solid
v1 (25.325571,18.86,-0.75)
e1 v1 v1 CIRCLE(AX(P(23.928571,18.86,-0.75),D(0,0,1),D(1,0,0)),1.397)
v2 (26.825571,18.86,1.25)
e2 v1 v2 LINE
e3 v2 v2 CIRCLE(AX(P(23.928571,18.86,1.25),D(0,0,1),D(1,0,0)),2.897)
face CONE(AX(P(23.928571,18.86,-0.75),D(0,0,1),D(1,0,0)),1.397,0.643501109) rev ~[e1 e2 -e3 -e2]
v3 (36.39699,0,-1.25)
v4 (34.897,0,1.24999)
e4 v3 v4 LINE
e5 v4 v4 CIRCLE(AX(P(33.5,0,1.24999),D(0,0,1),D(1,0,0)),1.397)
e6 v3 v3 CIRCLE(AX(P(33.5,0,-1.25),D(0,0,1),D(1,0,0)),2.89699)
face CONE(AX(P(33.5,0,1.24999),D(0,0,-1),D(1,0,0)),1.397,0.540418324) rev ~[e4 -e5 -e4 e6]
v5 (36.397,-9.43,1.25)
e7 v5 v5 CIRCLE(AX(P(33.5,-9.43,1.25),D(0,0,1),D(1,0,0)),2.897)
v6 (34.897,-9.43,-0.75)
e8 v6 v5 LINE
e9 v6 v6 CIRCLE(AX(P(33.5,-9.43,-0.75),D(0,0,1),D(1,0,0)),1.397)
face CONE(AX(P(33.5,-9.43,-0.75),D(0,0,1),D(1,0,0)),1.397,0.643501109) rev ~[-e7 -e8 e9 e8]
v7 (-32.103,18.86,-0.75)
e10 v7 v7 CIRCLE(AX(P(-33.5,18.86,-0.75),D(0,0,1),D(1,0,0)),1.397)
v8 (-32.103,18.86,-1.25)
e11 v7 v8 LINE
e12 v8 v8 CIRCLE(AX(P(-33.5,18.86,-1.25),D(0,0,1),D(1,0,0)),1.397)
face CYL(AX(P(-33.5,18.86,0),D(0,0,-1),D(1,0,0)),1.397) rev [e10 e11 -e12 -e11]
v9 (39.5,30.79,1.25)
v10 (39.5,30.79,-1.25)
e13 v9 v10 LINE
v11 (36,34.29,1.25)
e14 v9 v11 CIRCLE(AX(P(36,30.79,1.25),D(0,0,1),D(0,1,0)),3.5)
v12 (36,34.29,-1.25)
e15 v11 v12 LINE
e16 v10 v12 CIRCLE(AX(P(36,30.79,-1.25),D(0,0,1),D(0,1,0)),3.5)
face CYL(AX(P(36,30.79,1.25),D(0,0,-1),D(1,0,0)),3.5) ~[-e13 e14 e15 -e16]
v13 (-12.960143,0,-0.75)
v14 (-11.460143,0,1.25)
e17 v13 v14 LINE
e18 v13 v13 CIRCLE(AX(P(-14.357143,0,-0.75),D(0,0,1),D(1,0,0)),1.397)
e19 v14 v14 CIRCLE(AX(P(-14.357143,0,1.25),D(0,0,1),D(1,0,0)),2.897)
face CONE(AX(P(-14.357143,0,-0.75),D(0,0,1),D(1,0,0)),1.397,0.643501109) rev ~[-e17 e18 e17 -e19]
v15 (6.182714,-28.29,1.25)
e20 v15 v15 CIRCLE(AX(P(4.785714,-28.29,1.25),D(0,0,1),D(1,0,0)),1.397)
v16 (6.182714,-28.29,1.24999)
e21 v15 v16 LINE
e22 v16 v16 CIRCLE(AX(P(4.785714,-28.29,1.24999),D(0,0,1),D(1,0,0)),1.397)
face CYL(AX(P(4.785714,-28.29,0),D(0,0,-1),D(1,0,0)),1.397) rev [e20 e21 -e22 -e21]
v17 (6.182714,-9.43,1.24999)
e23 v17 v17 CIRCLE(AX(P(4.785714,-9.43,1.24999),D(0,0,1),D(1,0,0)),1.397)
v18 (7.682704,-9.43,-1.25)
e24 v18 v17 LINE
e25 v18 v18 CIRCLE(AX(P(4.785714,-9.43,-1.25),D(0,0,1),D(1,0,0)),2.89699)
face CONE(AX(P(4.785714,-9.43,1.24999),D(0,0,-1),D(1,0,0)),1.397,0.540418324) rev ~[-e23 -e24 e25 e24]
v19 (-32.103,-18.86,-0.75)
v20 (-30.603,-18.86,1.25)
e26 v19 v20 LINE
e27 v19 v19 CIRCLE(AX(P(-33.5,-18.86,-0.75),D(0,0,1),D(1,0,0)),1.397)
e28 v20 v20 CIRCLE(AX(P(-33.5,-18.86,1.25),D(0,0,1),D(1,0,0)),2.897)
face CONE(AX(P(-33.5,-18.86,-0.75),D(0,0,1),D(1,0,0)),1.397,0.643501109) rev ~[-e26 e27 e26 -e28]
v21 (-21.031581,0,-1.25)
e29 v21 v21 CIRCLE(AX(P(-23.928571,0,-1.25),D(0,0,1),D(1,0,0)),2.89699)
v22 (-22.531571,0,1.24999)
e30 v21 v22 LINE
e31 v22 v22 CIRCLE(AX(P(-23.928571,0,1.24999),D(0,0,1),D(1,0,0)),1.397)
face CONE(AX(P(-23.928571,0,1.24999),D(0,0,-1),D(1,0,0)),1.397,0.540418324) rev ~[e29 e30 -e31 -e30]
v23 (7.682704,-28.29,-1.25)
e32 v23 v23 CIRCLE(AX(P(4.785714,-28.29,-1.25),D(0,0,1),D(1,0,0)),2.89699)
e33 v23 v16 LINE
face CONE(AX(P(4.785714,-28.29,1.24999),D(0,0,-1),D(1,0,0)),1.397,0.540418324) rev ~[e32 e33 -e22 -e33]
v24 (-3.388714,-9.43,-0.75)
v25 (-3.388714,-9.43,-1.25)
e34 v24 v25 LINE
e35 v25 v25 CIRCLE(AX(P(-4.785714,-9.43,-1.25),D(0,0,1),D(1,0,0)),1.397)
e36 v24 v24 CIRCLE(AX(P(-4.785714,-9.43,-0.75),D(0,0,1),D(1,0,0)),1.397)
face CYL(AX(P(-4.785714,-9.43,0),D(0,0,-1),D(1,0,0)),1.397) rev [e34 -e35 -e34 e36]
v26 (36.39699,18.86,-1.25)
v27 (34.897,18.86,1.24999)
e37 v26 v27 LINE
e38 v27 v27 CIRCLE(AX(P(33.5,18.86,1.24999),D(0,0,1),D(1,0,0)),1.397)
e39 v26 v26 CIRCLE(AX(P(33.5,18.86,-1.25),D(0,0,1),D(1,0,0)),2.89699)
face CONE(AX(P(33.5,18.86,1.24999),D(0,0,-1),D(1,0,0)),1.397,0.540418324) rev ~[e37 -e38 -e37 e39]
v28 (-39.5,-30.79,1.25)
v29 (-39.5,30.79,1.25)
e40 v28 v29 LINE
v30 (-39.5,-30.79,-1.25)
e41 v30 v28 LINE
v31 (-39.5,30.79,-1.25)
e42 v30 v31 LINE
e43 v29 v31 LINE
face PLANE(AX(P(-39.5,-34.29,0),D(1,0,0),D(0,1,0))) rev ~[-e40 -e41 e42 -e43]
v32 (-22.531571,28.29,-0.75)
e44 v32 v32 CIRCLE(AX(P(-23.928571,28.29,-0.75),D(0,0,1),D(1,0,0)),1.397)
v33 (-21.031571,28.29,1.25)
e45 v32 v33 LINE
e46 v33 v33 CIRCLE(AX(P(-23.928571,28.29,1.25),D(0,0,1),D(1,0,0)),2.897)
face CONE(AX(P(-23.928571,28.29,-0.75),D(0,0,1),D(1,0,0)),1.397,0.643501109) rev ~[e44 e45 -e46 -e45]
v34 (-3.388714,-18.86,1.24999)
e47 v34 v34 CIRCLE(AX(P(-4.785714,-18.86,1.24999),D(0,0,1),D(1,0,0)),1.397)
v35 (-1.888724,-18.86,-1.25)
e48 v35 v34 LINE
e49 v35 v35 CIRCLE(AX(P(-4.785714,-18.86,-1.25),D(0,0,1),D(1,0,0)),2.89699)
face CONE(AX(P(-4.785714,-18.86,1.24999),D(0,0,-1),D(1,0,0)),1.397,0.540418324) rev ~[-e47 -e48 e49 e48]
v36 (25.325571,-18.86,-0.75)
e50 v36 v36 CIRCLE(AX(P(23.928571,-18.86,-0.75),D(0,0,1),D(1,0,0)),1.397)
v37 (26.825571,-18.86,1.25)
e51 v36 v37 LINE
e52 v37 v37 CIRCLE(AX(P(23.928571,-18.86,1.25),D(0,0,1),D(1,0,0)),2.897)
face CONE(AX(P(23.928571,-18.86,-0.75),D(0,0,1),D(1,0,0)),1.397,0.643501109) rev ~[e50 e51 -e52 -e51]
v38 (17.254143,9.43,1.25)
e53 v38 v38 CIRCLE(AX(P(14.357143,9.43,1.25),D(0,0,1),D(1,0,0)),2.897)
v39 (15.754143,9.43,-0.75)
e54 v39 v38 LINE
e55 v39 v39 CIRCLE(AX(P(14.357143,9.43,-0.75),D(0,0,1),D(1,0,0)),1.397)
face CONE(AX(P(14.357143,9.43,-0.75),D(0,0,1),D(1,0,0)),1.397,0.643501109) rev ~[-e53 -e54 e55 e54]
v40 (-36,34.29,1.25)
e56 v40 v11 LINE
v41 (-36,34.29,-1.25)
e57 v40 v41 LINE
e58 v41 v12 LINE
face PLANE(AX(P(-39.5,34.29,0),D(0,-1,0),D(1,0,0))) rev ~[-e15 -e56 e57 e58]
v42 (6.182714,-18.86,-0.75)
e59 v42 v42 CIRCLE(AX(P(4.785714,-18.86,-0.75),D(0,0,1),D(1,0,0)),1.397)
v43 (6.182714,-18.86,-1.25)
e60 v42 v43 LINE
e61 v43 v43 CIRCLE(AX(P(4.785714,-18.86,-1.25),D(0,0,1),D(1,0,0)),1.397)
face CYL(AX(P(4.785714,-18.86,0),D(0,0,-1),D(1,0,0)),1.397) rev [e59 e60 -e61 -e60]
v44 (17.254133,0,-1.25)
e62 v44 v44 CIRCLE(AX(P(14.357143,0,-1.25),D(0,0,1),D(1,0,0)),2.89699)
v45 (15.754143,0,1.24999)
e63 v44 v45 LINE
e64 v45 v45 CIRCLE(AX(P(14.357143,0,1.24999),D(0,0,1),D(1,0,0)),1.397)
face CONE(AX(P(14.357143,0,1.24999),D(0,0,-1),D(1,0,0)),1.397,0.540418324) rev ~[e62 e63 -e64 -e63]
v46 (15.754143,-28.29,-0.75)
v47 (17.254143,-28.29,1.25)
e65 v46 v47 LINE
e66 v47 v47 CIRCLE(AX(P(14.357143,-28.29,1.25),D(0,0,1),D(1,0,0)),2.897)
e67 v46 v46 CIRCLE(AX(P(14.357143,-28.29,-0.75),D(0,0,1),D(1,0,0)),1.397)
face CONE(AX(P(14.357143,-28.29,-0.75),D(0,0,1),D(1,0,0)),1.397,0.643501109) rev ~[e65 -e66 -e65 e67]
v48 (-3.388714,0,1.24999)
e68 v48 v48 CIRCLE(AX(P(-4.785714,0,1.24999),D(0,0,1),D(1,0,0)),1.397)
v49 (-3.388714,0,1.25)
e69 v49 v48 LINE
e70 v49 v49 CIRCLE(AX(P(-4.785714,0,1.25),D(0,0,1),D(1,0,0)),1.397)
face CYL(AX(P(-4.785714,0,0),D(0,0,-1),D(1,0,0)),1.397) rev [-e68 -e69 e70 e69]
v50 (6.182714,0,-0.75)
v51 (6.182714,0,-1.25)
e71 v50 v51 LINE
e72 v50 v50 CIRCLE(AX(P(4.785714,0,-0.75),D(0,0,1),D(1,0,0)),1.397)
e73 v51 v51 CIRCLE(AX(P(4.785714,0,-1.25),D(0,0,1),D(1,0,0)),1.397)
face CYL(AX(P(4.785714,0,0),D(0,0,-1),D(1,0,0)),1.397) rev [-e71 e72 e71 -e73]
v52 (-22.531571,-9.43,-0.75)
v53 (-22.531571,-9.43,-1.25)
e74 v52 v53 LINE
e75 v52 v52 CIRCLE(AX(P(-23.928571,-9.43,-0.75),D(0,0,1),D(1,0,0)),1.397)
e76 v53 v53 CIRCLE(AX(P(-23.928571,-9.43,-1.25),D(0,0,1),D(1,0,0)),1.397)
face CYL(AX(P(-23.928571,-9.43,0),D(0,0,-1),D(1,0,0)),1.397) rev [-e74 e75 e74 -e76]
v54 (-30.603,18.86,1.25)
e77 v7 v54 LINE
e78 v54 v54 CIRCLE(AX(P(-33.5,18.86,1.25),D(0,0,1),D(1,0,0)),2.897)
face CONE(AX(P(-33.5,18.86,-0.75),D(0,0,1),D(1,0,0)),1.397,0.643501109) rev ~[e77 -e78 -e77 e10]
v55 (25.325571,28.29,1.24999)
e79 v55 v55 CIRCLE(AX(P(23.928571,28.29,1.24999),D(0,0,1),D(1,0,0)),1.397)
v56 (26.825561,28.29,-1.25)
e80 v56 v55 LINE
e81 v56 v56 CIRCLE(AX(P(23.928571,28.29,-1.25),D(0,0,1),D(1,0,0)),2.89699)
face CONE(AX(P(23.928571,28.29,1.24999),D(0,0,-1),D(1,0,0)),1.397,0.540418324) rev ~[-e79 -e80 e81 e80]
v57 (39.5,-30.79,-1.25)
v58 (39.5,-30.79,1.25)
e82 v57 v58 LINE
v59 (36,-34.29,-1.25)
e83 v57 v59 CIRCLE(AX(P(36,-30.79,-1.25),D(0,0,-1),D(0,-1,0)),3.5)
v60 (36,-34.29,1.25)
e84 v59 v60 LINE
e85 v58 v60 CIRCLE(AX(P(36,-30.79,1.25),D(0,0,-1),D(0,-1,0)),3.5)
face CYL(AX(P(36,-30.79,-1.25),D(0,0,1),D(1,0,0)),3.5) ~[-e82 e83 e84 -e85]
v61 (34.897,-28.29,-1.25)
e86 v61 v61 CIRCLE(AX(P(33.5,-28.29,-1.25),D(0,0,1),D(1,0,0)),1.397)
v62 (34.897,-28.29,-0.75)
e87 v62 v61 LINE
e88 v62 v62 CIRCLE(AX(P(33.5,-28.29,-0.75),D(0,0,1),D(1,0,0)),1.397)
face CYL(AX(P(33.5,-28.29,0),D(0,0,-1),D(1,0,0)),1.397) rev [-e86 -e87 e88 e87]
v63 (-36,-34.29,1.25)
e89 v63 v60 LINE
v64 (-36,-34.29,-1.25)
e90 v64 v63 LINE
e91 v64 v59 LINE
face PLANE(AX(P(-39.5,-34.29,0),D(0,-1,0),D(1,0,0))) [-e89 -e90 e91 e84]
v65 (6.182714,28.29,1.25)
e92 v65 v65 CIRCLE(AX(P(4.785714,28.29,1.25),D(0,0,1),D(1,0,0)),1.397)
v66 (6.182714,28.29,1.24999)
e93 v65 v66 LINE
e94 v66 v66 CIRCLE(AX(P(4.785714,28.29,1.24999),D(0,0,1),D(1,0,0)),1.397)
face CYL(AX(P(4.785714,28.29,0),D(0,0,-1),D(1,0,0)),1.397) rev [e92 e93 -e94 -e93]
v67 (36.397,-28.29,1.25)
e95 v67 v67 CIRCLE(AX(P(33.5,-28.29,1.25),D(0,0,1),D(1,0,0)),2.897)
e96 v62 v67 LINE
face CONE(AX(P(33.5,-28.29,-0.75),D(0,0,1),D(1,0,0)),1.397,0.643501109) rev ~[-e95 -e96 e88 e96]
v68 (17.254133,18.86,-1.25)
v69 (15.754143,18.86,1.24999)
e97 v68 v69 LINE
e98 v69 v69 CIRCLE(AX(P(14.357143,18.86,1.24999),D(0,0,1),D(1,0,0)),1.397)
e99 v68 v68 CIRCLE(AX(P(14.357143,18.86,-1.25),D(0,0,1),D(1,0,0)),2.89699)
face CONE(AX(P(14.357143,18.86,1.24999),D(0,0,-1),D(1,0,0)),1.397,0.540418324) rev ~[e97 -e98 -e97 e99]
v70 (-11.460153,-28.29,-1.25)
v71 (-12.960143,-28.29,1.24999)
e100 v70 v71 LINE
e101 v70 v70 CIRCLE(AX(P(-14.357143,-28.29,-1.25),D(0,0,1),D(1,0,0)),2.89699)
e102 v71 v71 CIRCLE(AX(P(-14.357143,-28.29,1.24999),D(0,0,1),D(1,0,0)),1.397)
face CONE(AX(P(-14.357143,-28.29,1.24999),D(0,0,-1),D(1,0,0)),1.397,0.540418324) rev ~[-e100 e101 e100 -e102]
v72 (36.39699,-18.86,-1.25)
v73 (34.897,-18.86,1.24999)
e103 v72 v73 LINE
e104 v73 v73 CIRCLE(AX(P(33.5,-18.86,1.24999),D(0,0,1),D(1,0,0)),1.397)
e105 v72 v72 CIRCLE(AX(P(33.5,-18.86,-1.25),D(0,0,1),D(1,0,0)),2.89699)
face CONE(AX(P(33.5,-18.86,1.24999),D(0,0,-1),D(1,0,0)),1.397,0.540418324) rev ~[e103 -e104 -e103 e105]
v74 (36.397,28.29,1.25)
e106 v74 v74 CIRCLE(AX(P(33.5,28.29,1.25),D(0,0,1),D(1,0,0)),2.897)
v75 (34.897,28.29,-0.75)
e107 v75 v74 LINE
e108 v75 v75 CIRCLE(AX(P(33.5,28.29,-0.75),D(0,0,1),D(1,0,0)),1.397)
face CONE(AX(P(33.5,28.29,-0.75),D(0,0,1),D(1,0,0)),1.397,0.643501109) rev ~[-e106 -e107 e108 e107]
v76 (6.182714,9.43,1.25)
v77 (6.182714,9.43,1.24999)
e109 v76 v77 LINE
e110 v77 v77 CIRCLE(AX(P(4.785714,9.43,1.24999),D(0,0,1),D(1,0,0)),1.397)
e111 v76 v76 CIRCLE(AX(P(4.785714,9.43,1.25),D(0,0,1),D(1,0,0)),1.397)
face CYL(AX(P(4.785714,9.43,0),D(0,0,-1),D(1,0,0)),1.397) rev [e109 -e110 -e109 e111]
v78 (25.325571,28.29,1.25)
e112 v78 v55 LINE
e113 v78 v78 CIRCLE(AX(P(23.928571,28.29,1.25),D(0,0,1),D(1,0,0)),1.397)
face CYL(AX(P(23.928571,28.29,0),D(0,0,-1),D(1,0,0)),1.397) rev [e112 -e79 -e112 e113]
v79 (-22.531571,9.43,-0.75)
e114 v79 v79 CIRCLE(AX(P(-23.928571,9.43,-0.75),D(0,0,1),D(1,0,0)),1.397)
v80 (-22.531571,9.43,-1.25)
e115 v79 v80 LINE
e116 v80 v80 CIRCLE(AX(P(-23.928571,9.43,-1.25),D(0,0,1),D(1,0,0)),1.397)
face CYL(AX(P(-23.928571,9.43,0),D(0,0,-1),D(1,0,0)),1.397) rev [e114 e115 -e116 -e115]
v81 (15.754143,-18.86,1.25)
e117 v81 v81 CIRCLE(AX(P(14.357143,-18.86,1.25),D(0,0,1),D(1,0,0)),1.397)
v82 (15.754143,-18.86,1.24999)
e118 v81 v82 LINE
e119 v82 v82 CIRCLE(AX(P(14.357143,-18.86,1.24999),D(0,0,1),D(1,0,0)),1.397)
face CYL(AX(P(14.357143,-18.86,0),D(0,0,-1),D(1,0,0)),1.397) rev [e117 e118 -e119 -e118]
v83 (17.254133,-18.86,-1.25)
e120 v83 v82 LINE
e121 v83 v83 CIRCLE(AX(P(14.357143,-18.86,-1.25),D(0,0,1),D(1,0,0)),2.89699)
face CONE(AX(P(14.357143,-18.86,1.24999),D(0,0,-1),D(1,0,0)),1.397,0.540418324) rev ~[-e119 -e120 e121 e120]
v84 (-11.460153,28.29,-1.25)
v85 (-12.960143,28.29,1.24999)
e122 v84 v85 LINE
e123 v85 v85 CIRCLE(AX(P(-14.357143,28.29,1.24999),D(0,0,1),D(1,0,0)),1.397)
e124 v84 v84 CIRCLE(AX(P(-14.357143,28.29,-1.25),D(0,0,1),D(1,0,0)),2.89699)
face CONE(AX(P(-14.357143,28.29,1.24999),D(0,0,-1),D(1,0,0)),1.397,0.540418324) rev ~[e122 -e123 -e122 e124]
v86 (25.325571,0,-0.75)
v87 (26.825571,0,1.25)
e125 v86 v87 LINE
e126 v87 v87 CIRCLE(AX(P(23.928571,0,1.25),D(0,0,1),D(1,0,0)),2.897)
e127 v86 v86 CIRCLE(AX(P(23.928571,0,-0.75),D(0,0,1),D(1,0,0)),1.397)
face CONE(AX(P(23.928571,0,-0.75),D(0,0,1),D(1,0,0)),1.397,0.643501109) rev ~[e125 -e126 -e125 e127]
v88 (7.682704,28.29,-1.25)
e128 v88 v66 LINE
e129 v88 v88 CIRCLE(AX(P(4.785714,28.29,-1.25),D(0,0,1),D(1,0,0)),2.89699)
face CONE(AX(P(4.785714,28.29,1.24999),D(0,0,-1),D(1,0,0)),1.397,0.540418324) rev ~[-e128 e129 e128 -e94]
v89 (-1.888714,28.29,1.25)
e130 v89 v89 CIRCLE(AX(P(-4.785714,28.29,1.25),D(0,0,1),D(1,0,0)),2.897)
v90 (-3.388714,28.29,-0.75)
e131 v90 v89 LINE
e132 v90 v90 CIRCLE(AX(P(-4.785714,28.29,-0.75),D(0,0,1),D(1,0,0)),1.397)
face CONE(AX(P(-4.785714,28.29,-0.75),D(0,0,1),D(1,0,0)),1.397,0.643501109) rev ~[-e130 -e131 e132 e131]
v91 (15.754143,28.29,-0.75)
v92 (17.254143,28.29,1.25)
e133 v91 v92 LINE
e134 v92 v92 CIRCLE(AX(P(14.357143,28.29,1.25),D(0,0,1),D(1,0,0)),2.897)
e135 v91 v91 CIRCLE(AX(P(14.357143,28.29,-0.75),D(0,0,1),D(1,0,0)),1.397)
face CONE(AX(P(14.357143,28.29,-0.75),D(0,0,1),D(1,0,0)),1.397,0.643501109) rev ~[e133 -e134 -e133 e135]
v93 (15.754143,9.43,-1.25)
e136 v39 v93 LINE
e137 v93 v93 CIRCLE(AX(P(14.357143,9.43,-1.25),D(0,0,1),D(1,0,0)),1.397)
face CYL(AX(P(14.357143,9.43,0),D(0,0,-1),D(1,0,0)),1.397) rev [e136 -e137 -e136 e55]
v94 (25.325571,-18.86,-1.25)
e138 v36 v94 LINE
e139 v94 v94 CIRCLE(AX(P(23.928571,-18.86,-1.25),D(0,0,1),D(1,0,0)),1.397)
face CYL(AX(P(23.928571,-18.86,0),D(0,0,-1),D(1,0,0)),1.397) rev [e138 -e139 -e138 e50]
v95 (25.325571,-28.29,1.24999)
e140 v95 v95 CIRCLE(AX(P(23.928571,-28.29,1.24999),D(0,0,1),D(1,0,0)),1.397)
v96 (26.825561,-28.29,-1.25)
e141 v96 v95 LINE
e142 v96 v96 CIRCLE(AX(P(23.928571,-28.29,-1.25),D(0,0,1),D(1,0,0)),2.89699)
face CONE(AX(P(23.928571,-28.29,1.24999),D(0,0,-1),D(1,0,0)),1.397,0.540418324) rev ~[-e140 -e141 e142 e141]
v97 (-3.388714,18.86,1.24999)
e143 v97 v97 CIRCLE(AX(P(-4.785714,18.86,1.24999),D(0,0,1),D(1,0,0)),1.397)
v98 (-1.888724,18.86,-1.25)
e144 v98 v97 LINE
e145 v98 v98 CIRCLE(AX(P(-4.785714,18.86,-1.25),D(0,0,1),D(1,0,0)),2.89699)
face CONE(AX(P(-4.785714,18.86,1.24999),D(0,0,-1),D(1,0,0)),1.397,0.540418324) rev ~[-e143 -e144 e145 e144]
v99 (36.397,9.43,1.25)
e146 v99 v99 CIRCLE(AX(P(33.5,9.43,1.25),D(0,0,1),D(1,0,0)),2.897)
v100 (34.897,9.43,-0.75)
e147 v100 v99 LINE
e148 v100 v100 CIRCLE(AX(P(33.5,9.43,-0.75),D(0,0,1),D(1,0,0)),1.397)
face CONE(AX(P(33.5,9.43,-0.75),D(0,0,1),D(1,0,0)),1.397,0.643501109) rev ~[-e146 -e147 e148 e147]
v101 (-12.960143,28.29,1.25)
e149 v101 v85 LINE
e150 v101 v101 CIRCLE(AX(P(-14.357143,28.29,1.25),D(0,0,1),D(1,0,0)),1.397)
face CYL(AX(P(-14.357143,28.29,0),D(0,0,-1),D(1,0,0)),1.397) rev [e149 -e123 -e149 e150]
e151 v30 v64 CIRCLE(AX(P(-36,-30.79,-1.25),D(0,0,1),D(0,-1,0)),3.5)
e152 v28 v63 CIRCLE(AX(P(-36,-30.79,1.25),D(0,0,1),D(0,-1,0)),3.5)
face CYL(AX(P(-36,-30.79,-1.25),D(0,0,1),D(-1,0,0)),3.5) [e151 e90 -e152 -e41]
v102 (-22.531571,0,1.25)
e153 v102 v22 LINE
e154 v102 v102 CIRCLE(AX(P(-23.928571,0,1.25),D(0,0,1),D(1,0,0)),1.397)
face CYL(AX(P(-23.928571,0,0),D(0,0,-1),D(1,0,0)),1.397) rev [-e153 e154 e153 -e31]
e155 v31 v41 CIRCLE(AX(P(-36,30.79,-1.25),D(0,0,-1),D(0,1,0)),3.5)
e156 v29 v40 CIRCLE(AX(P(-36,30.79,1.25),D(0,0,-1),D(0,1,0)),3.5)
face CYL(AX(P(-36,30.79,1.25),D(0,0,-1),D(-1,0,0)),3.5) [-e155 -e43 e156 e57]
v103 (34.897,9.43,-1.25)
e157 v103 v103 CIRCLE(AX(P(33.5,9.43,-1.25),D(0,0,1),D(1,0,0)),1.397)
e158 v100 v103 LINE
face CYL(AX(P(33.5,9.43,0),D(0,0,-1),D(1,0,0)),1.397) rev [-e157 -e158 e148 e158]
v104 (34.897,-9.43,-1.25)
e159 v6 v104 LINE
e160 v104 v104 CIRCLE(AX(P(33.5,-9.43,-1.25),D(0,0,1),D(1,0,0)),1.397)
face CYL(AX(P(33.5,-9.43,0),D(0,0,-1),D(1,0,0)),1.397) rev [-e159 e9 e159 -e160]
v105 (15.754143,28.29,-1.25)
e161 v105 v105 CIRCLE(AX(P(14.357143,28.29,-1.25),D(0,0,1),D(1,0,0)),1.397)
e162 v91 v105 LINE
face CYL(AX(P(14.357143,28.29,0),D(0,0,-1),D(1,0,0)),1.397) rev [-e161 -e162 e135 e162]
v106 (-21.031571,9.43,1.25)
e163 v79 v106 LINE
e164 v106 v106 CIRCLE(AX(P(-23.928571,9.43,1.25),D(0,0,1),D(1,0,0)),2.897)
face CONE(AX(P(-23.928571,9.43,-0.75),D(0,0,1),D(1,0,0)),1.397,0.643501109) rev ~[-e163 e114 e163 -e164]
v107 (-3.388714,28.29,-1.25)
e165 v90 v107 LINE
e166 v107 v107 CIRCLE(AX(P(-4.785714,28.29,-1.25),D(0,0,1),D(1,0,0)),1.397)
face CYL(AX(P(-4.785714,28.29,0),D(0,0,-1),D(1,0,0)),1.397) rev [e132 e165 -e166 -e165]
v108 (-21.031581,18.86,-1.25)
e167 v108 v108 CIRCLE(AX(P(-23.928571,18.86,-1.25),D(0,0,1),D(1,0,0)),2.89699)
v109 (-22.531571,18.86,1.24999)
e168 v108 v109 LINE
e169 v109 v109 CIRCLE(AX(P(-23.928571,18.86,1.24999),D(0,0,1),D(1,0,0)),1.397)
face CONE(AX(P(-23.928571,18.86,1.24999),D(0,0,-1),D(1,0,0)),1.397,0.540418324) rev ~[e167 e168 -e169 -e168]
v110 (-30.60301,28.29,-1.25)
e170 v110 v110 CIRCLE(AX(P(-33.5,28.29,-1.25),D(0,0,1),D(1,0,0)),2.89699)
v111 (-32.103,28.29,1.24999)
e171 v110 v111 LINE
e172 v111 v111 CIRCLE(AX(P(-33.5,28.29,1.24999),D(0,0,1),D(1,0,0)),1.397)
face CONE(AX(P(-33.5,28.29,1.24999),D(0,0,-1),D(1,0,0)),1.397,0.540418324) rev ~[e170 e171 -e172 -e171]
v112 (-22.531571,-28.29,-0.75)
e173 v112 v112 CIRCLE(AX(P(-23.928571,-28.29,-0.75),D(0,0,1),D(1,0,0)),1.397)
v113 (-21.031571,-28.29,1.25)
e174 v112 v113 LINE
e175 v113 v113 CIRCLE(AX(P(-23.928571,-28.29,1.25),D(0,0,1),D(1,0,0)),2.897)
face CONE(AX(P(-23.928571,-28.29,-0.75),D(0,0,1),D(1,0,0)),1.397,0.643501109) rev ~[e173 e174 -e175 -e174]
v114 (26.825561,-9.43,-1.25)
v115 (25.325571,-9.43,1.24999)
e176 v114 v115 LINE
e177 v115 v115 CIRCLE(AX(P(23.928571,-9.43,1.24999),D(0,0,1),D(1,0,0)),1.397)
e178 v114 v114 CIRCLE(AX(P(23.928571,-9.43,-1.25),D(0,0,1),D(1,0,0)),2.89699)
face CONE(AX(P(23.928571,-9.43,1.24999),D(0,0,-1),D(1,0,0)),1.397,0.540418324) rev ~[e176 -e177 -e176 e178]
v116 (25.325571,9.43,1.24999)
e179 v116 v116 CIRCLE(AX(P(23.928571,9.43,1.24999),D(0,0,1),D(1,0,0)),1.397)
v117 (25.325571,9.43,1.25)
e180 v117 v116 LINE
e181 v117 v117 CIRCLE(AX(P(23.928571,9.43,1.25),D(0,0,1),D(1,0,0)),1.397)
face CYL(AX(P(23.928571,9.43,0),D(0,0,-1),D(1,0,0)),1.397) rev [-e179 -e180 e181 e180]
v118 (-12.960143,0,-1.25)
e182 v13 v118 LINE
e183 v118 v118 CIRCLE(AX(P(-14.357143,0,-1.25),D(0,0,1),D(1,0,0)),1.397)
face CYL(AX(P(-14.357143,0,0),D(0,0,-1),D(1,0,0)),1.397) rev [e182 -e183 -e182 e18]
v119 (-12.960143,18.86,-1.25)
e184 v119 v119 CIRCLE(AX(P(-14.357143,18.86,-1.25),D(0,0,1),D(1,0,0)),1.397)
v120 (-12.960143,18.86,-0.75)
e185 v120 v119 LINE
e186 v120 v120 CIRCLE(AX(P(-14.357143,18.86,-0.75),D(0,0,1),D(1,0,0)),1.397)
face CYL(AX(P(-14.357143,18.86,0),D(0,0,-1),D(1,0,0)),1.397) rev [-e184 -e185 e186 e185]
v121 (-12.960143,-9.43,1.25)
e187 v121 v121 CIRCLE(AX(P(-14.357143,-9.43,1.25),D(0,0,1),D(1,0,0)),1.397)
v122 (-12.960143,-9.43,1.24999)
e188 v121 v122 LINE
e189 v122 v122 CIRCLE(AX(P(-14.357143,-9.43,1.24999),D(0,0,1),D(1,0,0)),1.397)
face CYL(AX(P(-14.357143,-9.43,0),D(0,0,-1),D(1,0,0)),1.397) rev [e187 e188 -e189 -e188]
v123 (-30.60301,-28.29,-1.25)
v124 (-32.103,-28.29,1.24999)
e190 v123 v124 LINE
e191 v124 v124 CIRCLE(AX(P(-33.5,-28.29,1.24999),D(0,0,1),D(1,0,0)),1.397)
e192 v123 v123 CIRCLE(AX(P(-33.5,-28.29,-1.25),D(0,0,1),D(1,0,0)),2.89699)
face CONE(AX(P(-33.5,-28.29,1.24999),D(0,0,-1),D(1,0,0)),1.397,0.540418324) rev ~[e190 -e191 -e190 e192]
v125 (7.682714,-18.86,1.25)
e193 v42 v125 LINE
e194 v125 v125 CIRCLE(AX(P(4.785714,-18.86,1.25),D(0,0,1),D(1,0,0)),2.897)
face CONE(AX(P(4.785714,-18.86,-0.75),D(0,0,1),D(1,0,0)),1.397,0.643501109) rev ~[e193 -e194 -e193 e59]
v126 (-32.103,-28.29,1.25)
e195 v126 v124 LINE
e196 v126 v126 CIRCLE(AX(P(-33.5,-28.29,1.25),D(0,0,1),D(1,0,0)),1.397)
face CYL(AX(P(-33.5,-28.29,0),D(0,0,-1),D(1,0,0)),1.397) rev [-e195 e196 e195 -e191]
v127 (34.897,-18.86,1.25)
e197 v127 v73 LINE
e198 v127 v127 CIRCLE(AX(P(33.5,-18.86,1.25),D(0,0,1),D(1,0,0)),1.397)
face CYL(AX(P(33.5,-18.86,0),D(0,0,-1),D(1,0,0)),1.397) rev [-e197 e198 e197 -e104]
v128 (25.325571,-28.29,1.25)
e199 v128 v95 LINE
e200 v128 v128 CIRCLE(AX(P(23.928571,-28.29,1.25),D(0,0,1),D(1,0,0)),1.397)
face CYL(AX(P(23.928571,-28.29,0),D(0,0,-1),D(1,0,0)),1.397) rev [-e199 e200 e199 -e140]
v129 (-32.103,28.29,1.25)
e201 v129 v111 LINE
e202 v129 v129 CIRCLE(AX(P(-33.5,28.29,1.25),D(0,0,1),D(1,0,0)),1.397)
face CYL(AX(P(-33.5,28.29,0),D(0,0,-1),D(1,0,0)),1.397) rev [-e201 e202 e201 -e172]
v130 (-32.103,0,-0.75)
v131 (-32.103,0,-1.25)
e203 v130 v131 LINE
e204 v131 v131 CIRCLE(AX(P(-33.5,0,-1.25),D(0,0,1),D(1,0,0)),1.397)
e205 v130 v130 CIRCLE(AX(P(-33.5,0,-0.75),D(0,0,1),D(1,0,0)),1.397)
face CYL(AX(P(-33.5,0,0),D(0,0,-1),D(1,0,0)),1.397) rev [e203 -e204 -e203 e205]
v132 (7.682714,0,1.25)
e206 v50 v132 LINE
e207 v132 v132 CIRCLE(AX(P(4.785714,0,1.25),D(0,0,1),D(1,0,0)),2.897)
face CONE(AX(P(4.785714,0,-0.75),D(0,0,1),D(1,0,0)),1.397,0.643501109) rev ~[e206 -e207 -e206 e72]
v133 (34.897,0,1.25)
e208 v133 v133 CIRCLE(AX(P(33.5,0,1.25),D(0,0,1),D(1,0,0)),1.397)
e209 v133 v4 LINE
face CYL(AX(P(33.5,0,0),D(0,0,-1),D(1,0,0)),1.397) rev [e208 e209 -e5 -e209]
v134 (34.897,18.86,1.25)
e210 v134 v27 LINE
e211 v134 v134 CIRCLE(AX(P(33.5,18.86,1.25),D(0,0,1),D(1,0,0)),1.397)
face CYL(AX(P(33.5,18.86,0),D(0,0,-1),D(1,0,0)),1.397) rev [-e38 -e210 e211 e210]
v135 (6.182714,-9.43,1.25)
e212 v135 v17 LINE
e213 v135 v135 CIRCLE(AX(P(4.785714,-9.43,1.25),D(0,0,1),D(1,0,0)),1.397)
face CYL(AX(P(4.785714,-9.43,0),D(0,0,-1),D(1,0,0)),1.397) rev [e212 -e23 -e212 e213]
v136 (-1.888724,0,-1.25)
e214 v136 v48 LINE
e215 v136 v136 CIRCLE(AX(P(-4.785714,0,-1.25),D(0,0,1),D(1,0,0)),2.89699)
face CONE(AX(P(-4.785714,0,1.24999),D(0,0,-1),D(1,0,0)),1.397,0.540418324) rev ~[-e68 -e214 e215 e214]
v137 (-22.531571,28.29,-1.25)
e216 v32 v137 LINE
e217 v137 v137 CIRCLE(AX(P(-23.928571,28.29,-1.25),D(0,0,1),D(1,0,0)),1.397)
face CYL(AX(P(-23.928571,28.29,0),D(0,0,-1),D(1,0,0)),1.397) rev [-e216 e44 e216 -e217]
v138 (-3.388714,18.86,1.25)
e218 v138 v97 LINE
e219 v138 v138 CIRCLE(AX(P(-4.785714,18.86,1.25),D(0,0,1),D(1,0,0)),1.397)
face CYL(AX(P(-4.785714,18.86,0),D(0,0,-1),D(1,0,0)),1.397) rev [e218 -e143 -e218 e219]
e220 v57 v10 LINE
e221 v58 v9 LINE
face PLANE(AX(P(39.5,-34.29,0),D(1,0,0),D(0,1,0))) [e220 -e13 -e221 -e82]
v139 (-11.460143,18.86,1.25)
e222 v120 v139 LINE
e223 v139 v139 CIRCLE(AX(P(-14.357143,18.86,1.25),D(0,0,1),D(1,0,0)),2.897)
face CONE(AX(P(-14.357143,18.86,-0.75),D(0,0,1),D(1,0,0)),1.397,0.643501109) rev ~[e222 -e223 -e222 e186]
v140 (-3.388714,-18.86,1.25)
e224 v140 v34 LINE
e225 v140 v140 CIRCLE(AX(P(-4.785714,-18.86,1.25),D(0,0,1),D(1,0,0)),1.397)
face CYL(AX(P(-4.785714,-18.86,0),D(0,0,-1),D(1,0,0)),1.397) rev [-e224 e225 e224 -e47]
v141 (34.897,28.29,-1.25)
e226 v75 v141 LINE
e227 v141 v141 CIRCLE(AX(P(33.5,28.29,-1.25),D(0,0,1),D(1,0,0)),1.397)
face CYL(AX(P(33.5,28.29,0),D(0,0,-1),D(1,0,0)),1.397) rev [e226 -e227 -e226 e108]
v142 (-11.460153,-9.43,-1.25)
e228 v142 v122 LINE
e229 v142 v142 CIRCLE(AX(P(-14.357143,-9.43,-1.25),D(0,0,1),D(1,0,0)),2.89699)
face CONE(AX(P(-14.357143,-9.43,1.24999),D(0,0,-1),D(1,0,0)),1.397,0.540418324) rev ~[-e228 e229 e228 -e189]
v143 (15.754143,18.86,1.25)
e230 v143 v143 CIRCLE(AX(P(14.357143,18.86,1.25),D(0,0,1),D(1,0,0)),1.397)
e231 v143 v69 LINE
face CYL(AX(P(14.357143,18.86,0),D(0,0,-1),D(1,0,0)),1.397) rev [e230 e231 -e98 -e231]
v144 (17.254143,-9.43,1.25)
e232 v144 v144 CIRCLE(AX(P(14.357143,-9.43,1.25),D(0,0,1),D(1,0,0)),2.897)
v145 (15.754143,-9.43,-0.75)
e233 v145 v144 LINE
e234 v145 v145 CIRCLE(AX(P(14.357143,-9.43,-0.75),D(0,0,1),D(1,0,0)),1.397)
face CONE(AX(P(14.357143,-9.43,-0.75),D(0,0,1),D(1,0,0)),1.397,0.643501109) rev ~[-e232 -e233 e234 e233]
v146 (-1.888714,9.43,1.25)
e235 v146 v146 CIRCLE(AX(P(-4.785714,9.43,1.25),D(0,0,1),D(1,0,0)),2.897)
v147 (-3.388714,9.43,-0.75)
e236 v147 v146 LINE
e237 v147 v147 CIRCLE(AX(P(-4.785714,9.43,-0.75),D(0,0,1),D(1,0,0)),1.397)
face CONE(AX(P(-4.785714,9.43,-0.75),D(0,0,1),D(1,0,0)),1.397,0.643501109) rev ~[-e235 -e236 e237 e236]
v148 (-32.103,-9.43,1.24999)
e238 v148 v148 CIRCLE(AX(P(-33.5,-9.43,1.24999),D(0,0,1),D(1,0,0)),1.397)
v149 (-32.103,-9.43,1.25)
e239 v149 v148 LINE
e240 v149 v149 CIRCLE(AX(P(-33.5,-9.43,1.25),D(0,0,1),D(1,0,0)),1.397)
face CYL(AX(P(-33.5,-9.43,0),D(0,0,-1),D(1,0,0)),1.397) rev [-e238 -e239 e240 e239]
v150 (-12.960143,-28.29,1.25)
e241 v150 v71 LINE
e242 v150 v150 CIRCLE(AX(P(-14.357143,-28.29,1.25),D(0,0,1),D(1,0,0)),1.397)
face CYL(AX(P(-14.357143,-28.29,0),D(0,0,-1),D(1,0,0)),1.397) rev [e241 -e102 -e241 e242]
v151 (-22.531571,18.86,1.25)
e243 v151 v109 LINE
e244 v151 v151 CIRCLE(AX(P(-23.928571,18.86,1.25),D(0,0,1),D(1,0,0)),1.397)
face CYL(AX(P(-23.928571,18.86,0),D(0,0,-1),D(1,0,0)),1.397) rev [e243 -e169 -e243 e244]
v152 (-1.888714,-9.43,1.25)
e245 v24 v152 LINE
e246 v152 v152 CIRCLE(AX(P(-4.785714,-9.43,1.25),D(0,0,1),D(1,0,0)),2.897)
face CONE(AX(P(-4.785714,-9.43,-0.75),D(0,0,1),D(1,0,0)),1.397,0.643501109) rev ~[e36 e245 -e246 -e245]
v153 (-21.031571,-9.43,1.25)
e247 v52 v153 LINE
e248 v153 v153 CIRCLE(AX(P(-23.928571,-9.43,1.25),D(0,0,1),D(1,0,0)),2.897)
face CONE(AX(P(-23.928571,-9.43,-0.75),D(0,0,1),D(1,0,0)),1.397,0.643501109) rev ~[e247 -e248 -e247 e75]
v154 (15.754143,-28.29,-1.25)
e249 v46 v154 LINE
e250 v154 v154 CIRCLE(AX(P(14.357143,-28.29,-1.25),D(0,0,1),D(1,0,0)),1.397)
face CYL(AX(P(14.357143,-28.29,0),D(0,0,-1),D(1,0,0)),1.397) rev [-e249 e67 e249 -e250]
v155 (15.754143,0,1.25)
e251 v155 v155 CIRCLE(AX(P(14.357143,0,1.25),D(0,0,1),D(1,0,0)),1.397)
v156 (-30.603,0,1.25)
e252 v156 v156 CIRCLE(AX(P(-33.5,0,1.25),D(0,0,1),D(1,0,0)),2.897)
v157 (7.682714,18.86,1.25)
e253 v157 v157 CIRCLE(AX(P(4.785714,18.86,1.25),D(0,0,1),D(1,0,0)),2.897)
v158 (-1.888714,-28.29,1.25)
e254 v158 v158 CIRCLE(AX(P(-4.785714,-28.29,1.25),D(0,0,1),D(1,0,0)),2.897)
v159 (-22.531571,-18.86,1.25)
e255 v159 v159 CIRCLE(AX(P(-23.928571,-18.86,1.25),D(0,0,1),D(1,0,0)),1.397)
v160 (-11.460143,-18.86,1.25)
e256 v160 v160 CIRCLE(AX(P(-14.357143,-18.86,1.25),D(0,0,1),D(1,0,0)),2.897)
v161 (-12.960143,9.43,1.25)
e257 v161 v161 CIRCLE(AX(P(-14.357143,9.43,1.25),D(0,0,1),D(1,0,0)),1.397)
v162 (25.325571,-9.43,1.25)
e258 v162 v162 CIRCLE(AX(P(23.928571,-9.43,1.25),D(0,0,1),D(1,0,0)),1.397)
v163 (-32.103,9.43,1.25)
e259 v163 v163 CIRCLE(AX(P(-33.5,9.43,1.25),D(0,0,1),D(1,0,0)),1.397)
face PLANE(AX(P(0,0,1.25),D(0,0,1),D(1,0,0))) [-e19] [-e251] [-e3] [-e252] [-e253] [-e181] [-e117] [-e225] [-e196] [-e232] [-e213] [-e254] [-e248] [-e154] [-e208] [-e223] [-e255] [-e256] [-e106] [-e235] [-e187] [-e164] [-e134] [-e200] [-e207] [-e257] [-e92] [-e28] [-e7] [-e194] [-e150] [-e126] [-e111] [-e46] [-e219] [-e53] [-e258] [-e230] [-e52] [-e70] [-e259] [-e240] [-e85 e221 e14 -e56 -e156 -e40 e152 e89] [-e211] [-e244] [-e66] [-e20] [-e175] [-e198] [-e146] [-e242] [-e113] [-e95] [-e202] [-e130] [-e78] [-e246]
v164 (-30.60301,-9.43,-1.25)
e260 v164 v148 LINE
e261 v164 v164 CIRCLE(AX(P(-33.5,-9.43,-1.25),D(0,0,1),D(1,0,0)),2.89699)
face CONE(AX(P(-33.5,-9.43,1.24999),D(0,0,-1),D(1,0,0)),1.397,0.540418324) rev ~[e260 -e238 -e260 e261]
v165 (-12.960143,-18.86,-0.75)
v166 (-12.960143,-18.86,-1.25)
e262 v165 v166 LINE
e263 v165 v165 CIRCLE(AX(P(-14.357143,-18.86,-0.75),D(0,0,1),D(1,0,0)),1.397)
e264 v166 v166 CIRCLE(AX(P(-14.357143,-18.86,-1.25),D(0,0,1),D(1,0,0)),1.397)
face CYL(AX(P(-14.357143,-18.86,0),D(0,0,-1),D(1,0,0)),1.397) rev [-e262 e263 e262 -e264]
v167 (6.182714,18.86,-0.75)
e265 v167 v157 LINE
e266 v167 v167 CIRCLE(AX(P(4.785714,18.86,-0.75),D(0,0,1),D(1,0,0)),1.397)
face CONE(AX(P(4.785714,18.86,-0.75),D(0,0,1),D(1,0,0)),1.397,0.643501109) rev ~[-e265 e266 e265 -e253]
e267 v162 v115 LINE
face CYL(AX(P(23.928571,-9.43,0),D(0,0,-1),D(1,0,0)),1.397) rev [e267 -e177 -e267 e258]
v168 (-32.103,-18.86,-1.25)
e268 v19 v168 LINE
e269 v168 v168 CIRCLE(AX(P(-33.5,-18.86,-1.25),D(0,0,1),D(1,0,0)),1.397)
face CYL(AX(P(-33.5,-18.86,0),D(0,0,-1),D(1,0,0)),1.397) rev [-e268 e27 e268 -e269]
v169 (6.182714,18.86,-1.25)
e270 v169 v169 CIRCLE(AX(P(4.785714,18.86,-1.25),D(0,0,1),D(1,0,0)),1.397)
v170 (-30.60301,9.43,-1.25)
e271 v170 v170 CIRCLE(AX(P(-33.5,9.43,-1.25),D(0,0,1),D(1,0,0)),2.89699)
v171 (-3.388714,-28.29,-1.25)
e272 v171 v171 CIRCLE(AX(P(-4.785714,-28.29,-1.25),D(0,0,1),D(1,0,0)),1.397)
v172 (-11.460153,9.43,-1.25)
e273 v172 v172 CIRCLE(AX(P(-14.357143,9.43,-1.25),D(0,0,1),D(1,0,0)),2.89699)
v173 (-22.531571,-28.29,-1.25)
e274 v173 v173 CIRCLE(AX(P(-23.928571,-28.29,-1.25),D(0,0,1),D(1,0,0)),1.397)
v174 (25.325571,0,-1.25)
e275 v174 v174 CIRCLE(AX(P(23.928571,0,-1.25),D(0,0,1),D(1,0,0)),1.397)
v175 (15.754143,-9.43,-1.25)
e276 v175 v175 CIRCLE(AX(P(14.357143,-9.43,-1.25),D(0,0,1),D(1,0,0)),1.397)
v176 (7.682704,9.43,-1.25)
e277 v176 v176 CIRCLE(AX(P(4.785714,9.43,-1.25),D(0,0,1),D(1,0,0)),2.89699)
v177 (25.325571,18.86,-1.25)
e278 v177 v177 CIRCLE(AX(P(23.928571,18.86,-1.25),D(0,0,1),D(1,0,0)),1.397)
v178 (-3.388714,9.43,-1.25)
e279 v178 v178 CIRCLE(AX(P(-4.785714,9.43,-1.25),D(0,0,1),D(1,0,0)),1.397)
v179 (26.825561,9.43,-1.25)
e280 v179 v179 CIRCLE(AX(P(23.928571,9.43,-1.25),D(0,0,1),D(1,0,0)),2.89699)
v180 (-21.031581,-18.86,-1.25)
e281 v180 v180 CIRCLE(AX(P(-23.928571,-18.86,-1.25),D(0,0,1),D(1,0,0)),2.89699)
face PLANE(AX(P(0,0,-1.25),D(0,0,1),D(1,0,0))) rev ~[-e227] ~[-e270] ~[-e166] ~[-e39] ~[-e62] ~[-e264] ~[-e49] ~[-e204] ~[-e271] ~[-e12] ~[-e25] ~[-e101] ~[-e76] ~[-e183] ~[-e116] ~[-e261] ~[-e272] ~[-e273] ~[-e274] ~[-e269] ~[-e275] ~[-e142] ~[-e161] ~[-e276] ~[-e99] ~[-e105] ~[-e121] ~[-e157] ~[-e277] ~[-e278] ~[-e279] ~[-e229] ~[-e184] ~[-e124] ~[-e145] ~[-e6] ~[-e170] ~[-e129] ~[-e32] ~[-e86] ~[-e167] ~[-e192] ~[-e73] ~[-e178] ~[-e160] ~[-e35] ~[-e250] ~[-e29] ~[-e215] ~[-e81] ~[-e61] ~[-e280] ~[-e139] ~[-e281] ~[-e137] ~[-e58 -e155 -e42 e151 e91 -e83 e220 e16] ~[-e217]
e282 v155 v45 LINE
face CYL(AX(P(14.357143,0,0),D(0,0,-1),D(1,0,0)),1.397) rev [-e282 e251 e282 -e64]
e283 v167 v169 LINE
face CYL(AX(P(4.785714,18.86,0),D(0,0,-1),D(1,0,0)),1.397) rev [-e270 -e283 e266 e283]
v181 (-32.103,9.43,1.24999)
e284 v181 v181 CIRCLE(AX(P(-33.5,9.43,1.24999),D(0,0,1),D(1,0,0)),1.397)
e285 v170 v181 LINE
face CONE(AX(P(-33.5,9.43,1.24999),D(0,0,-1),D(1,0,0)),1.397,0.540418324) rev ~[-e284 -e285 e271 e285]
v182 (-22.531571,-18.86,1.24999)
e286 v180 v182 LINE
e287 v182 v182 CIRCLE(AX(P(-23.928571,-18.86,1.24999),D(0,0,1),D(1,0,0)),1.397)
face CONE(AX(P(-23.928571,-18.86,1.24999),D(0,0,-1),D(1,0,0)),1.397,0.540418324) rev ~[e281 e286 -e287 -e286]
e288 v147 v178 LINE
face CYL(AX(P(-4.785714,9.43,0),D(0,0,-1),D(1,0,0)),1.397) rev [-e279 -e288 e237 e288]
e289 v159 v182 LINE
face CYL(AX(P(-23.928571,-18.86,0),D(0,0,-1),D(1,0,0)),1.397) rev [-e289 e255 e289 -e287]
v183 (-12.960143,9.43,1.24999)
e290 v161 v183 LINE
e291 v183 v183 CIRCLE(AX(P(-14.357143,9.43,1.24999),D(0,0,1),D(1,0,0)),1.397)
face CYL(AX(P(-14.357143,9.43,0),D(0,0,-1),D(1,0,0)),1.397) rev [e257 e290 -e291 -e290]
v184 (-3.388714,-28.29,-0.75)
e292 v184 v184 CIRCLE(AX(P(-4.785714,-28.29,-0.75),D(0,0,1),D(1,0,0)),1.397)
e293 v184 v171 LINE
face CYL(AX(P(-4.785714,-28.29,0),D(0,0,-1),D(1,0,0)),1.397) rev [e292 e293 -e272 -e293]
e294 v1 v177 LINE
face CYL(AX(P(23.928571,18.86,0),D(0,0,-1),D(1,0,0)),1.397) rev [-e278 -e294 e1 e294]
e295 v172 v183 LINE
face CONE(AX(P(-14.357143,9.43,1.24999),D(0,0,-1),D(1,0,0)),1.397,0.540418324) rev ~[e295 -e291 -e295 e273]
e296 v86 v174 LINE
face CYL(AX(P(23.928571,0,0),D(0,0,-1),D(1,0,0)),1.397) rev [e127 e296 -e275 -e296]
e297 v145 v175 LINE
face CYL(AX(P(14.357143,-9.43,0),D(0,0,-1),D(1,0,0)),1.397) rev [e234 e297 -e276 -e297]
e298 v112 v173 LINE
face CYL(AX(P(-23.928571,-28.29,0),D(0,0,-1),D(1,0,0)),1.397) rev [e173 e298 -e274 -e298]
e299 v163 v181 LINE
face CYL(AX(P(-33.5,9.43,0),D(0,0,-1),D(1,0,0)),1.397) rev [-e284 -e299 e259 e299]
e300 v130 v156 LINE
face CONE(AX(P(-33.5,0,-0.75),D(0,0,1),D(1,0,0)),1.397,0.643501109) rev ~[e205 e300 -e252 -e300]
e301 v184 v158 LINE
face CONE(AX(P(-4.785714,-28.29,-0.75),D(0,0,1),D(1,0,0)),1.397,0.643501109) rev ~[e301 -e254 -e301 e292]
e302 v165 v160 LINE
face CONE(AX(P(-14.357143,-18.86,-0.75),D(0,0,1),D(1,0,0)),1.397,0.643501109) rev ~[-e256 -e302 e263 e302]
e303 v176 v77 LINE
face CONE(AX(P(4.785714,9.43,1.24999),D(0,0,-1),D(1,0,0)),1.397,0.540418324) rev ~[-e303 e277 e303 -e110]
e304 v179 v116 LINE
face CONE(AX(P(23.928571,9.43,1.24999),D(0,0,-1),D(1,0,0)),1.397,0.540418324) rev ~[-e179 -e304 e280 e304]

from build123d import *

# Parameters (mm, degrees)
F0_W        = 79
F0_H        = 68.58
F0_R        = 1.397
F1_DEPTH    = 1.25
F2_R        = 3.5
F3_SIZE2    = 2.49999
F3_SIZE     = 1.49999
F4_SIZE2    = 1.5
F4_SIZE     = 2
F4_2_SIZE2  = 1.5
F4_2_SIZE   = 2
F4_3_SIZE2  = 1.5
F4_3_SIZE   = 2
F4_4_SIZE2  = 1.5
F4_4_SIZE   = 2
F4_5_SIZE2  = 1.5
F4_5_SIZE   = 2
F4_6_SIZE2  = 1.5
F4_6_SIZE   = 2
F4_7_SIZE2  = 1.5
F4_7_SIZE   = 2
F4_8_SIZE2  = 1.5
F4_8_SIZE   = 2
F4_9_SIZE2  = 1.5
F4_9_SIZE   = 2
F4_10_SIZE2 = 1.5
F4_10_SIZE  = 2
F4_11_SIZE2 = 1.5
F4_11_SIZE  = 2
F4_12_SIZE2 = 1.5
F4_12_SIZE  = 2
F4_13_SIZE2 = 1.5
F4_13_SIZE  = 2
F4_14_SIZE2 = 1.5
F4_14_SIZE  = 2
F4_15_SIZE2 = 1.5
F4_15_SIZE  = 2
F4_16_SIZE2 = 1.5
F4_16_SIZE  = 2
F4_17_SIZE2 = 1.5
F4_17_SIZE  = 2
F4_18_SIZE2 = 1.5
F4_18_SIZE  = 2
F4_19_SIZE2 = 1.5
F4_19_SIZE  = 2
F4_20_SIZE2 = 1.5
F4_20_SIZE  = 2
F4_21_SIZE2 = 1.5
F4_21_SIZE  = 2
F4_22_SIZE2 = 1.5
F4_22_SIZE  = 2
F4_23_SIZE2 = 1.5
F4_23_SIZE  = 2
F4_24_SIZE2 = 1.5
F4_24_SIZE  = 2
F4_25_SIZE2 = 1.5
F4_25_SIZE  = 2
F4_26_SIZE2 = 1.5
F4_26_SIZE  = 2
F4_27_SIZE2 = 1.5
F4_27_SIZE  = 2
F4_28_SIZE2 = 1.5
F4_28_SIZE  = 2


# Not quite as in the source:
# - a fillet or chamfer is up to 0.001 mm smaller than in the source, because OpenCascade refuses the exact size


with BuildPart() as f1:
    # F0 (on Top) → F1 (new body, symmetric)
    with BuildSketch(Plane.XY):
        Rectangle(F0_W, F0_H)
        with Locations((-33.5, -28.29)):
            Circle(F0_R, mode=Mode.SUBTRACT)
        with Locations((-23.9285714286, -28.29)):
            Circle(F0_R, mode=Mode.SUBTRACT)
        with Locations((-33.5, -18.86)):
            Circle(F0_R, mode=Mode.SUBTRACT)
        with Locations((-23.9285714286, -18.86)):
            Circle(F0_R, mode=Mode.SUBTRACT)
        with Locations((-14.3571428571, -28.29)):
            Circle(F0_R, mode=Mode.SUBTRACT)
        with Locations((-4.7857142857, -28.29)):
            Circle(F0_R, mode=Mode.SUBTRACT)
        with Locations((-14.3571428571, -18.86)):
            Circle(F0_R, mode=Mode.SUBTRACT)
        with Locations((-4.7857142857, -18.86)):
            Circle(F0_R, mode=Mode.SUBTRACT)
        with Locations((-33.5, -9.43)):
            Circle(F0_R, mode=Mode.SUBTRACT)
        with Locations((-23.9285714286, -9.43)):
            Circle(F0_R, mode=Mode.SUBTRACT)
        with Locations((-14.3571428571, -9.43)):
            Circle(F0_R, mode=Mode.SUBTRACT)
        with Locations((-4.7857142857, -9.43)):
            Circle(F0_R, mode=Mode.SUBTRACT)
        with Locations((4.7857142857, -28.29)):
            Circle(F0_R, mode=Mode.SUBTRACT)
        with Locations((14.3571428571, -28.29)):
            Circle(F0_R, mode=Mode.SUBTRACT)
        with Locations((4.7857142857, -18.86)):
            Circle(F0_R, mode=Mode.SUBTRACT)
        with Locations((14.3571428571, -18.86)):
            Circle(F0_R, mode=Mode.SUBTRACT)
        with Locations((23.9285714286, -28.29)):
            Circle(F0_R, mode=Mode.SUBTRACT)
        with Locations((33.5, -28.29)):
            Circle(F0_R, mode=Mode.SUBTRACT)
        with Locations((23.9285714286, -18.86)):
            Circle(F0_R, mode=Mode.SUBTRACT)
        with Locations((33.5, -18.86)):
            Circle(F0_R, mode=Mode.SUBTRACT)
        with Locations((4.7857142857, -9.43)):
            Circle(F0_R, mode=Mode.SUBTRACT)
        with Locations((14.3571428571, -9.43)):
            Circle(F0_R, mode=Mode.SUBTRACT)
        with Locations((23.9285714286, -9.43)):
            Circle(F0_R, mode=Mode.SUBTRACT)
        with Locations((33.5, -9.43)):
            Circle(F0_R, mode=Mode.SUBTRACT)
        with Locations((-33.5, 0)):
            Circle(F0_R, mode=Mode.SUBTRACT)
        with Locations((-23.9285714286, 0)):
            Circle(F0_R, mode=Mode.SUBTRACT)
        with Locations((-33.5, 9.43)):
            Circle(F0_R, mode=Mode.SUBTRACT)
        with Locations((-23.9285714286, 9.43)):
            Circle(F0_R, mode=Mode.SUBTRACT)
        with Locations((-14.3571428571, 0)):
            Circle(F0_R, mode=Mode.SUBTRACT)
        with Locations((-4.7857142857, 0)):
            Circle(F0_R, mode=Mode.SUBTRACT)
        with Locations((-14.3571428571, 9.43)):
            Circle(F0_R, mode=Mode.SUBTRACT)
        with Locations((-4.7857142857, 9.43)):
            Circle(F0_R, mode=Mode.SUBTRACT)
        with Locations((-33.5, 18.86)):
            Circle(F0_R, mode=Mode.SUBTRACT)
        with Locations((-23.9285714286, 18.86)):
            Circle(F0_R, mode=Mode.SUBTRACT)
        with Locations((-33.5, 28.29)):
            Circle(F0_R, mode=Mode.SUBTRACT)
        with Locations((-23.9285714286, 28.29)):
            Circle(F0_R, mode=Mode.SUBTRACT)
        with Locations((-14.3571428571, 18.86)):
            Circle(F0_R, mode=Mode.SUBTRACT)
        with Locations((-4.7857142857, 18.86)):
            Circle(F0_R, mode=Mode.SUBTRACT)
        with Locations((-14.3571428571, 28.29)):
            Circle(F0_R, mode=Mode.SUBTRACT)
        with Locations((-4.7857142857, 28.29)):
            Circle(F0_R, mode=Mode.SUBTRACT)
        with Locations((4.7857142857, 0)):
            Circle(F0_R, mode=Mode.SUBTRACT)
        with Locations((14.3571428571, 0)):
            Circle(F0_R, mode=Mode.SUBTRACT)
        with Locations((4.7857142857, 9.43)):
            Circle(F0_R, mode=Mode.SUBTRACT)
        with Locations((14.3571428571, 9.43)):
            Circle(F0_R, mode=Mode.SUBTRACT)
        with Locations((23.9285714286, 0)):
            Circle(F0_R, mode=Mode.SUBTRACT)
        with Locations((33.5, 0)):
            Circle(F0_R, mode=Mode.SUBTRACT)
        with Locations((23.9285714286, 9.43)):
            Circle(F0_R, mode=Mode.SUBTRACT)
        with Locations((33.5, 9.43)):
            Circle(F0_R, mode=Mode.SUBTRACT)
        with Locations((4.7857142857, 18.86)):
            Circle(F0_R, mode=Mode.SUBTRACT)
        with Locations((14.3571428571, 18.86)):
            Circle(F0_R, mode=Mode.SUBTRACT)
        with Locations((4.7857142857, 28.29)):
            Circle(F0_R, mode=Mode.SUBTRACT)
        with Locations((14.3571428571, 28.29)):
            Circle(F0_R, mode=Mode.SUBTRACT)
        with Locations((23.9285714286, 18.86)):
            Circle(F0_R, mode=Mode.SUBTRACT)
        with Locations((33.5, 18.86)):
            Circle(F0_R, mode=Mode.SUBTRACT)
        with Locations((23.9285714286, 28.29)):
            Circle(F0_R, mode=Mode.SUBTRACT)
        with Locations((33.5, 28.29)):
            Circle(F0_R, mode=Mode.SUBTRACT)
    extrude(amount=F1_DEPTH, both=True)

    # F2
    f2_edges = [f1.edges().sort_by_distance(p)[0] for p in [
        (39.5, -34.29, 0),
        (-39.5, -34.29, 0),
        (-39.5, 34.29, 0),
        (39.5, 34.29, 0),
    ]]
    fillet(f2_edges, radius=F2_R)

    # F3 (size 1.5 and 2.5 in the source; OpenCascade refuses exactly that, so slightly less here)
    f3_edges = [f1.edges().sort_by_distance(p)[0] for p in [
        (-15.754143, 28.29, -1.25),
        (-25.325571, 18.86, -1.25),
        (-34.897, 9.43, -1.25),
        (3.388714, 28.29, -1.25),
        (-6.182714, 18.86, -1.25),
        (-15.754143, 9.43, -1.25),
        (-25.325571, 0, -1.25),
        (-34.897, -9.43, -1.25),
        (-34.897, -28.29, -1.25),
        (-25.325571, -18.86, -1.25),
        (-15.754143, -9.43, -1.25),
        (-6.182714, 0, -1.25),
        (3.388714, 9.43, -1.25),
        (12.960143, 18.86, -1.25),
        (22.531571, 28.29, -1.25),
        (32.103, 18.86, -1.25),
        (12.960143, 0, -1.25),
        (3.388714, -9.43, -1.25),
        (-6.182714, -18.86, -1.25),
        (-15.754143, -28.29, -1.25),
        (32.103, 0, -1.25),
        (22.531571, -9.43, -1.25),
        (12.960143, -18.86, -1.25),
        (3.388714, -28.29, -1.25),
        (32.103, -18.86, -1.25),
        (22.531571, -28.29, -1.25),
        (22.531571, 9.43, -1.25),
        (-34.897, 28.29, -1.25),
    ]]
    f3_side = f1.faces().sort_by_distance((0, 0, -1.25))[0]
    chamfer(f3_edges, length=F3_SIZE, length2=F3_SIZE2, reference=f3_side)

    # F4
    f4_edges = [f1.edges().sort_by_distance(p)[0] for p in [
        (-25.325571, 28.29, 1.25),
    ]]
    f4_side = f1.faces().sort_by_distance((-25.325571, 28.29, 0))[0]
    chamfer(f4_edges, length=F4_SIZE, length2=F4_SIZE2, reference=f4_side)

    # F4#2
    f4_2_edges = [f1.edges().sort_by_distance(p)[0] for p in [
        (-34.897, 0, 1.25),
    ]]
    f4_2_side = f1.faces().sort_by_distance((-34.897, 0, 0))[0]
    chamfer(f4_2_edges, length=F4_2_SIZE, length2=F4_2_SIZE2, reference=f4_2_side)

    # F4#3
    f4_3_edges = [f1.edges().sort_by_distance(p)[0] for p in [
        (-25.325571, 9.43, 1.25),
    ]]
    f4_3_side = f1.faces().sort_by_distance((-25.325571, 9.43, 0))[0]
    chamfer(f4_3_edges, length=F4_3_SIZE, length2=F4_3_SIZE2, reference=f4_3_side)

    # F4#4
    f4_4_edges = [f1.edges().sort_by_distance(p)[0] for p in [
        (-15.754143, 18.86, 1.25),
    ]]
    f4_4_side = f1.faces().sort_by_distance((-15.754143, 18.86, 0))[0]
    chamfer(f4_4_edges, length=F4_4_SIZE, length2=F4_4_SIZE2, reference=f4_4_side)

    # F4#5
    f4_5_edges = [f1.edges().sort_by_distance(p)[0] for p in [
        (-6.182714, 28.29, 1.25),
    ]]
    f4_5_side = f1.faces().sort_by_distance((-6.182714, 28.29, 0))[0]
    chamfer(f4_5_edges, length=F4_5_SIZE, length2=F4_5_SIZE2, reference=f4_5_side)

    # F4#6
    f4_6_edges = [f1.edges().sort_by_distance(p)[0] for p in [
        (-34.897, -18.86, 1.25),
    ]]
    f4_6_side = f1.faces().sort_by_distance((-34.897, -18.86, 0))[0]
    chamfer(f4_6_edges, length=F4_6_SIZE, length2=F4_6_SIZE2, reference=f4_6_side)

    # F4#7
    f4_7_edges = [f1.edges().sort_by_distance(p)[0] for p in [
        (-25.325571, -9.43, 1.25),
    ]]
    f4_7_side = f1.faces().sort_by_distance((-25.325571, -9.43, 0))[0]
    chamfer(f4_7_edges, length=F4_7_SIZE, length2=F4_7_SIZE2, reference=f4_7_side)

    # F4#8
    f4_8_edges = [f1.edges().sort_by_distance(p)[0] for p in [
        (-15.754143, 0, 1.25),
    ]]
    f4_8_side = f1.faces().sort_by_distance((-15.754143, 0, 0))[0]
    chamfer(f4_8_edges, length=F4_8_SIZE, length2=F4_8_SIZE2, reference=f4_8_side)

    # F4#9
    f4_9_edges = [f1.edges().sort_by_distance(p)[0] for p in [
        (-6.182714, 9.43, 1.25),
    ]]
    f4_9_side = f1.faces().sort_by_distance((-6.182714, 9.43, 0))[0]
    chamfer(f4_9_edges, length=F4_9_SIZE, length2=F4_9_SIZE2, reference=f4_9_side)

    # F4#10
    f4_10_edges = [f1.edges().sort_by_distance(p)[0] for p in [
        (3.388714, 18.86, 1.25),
    ]]
    f4_10_side = f1.faces().sort_by_distance((3.388714, 18.86, 0))[0]
    chamfer(f4_10_edges, length=F4_10_SIZE, length2=F4_10_SIZE2, reference=f4_10_side)

    # F4#11
    f4_11_edges = [f1.edges().sort_by_distance(p)[0] for p in [
        (12.960143, 28.29, 1.25),
    ]]
    f4_11_side = f1.faces().sort_by_distance((12.960143, 28.29, 0))[0]
    chamfer(f4_11_edges, length=F4_11_SIZE, length2=F4_11_SIZE2, reference=f4_11_side)

    # F4#12
    f4_12_edges = [f1.edges().sort_by_distance(p)[0] for p in [
        (22.531571, 18.86, 1.25),
    ]]
    f4_12_side = f1.faces().sort_by_distance((22.531571, 18.86, 0))[0]
    chamfer(f4_12_edges, length=F4_12_SIZE, length2=F4_12_SIZE2, reference=f4_12_side)

    # F4#13
    f4_13_edges = [f1.edges().sort_by_distance(p)[0] for p in [
        (32.103, 28.29, 1.25),
    ]]
    f4_13_side = f1.faces().sort_by_distance((32.103, 28.29, 0))[0]
    chamfer(f4_13_edges, length=F4_13_SIZE, length2=F4_13_SIZE2, reference=f4_13_side)

    # F4#14
    f4_14_edges = [f1.edges().sort_by_distance(p)[0] for p in [
        (12.960143, 9.43, 1.25),
    ]]
    f4_14_side = f1.faces().sort_by_distance((12.960143, 9.43, 0))[0]
    chamfer(f4_14_edges, length=F4_14_SIZE, length2=F4_14_SIZE2, reference=f4_14_side)

    # F4#15
    f4_15_edges = [f1.edges().sort_by_distance(p)[0] for p in [
        (3.388714, 0, 1.25),
    ]]
    f4_15_side = f1.faces().sort_by_distance((3.388714, 0, 0))[0]
    chamfer(f4_15_edges, length=F4_15_SIZE, length2=F4_15_SIZE2, reference=f4_15_side)

    # F4#16
    f4_16_edges = [f1.edges().sort_by_distance(p)[0] for p in [
        (-6.182714, -9.43, 1.25),
    ]]
    f4_16_side = f1.faces().sort_by_distance((-6.182714, -9.43, 0))[0]
    chamfer(f4_16_edges, length=F4_16_SIZE, length2=F4_16_SIZE2, reference=f4_16_side)

    # F4#17
    f4_17_edges = [f1.edges().sort_by_distance(p)[0] for p in [
        (-15.754143, -18.86, 1.25),
    ]]
    f4_17_side = f1.faces().sort_by_distance((-15.754143, -18.86, 0))[0]
    chamfer(f4_17_edges, length=F4_17_SIZE, length2=F4_17_SIZE2, reference=f4_17_side)

    # F4#18
    f4_18_edges = [f1.edges().sort_by_distance(p)[0] for p in [
        (-25.325571, -28.29, 1.25),
    ]]
    f4_18_side = f1.faces().sort_by_distance((-25.325571, -28.29, 0))[0]
    chamfer(f4_18_edges, length=F4_18_SIZE, length2=F4_18_SIZE2, reference=f4_18_side)

    # F4#19
    f4_19_edges = [f1.edges().sort_by_distance(p)[0] for p in [
        (22.531571, 0, 1.25),
    ]]
    f4_19_side = f1.faces().sort_by_distance((22.531571, 0, 0))[0]
    chamfer(f4_19_edges, length=F4_19_SIZE, length2=F4_19_SIZE2, reference=f4_19_side)

    # F4#20
    f4_20_edges = [f1.edges().sort_by_distance(p)[0] for p in [
        (32.103, -9.43, 1.25),
    ]]
    f4_20_side = f1.faces().sort_by_distance((32.103, -9.43, 0))[0]
    chamfer(f4_20_edges, length=F4_20_SIZE, length2=F4_20_SIZE2, reference=f4_20_side)

    # F4#21
    f4_21_edges = [f1.edges().sort_by_distance(p)[0] for p in [
        (32.103, 9.43, 1.25),
    ]]
    f4_21_side = f1.faces().sort_by_distance((32.103, 9.43, 0))[0]
    chamfer(f4_21_edges, length=F4_21_SIZE, length2=F4_21_SIZE2, reference=f4_21_side)

    # F4#22
    f4_22_edges = [f1.edges().sort_by_distance(p)[0] for p in [
        (12.960143, -9.43, 1.25),
    ]]
    f4_22_side = f1.faces().sort_by_distance((12.960143, -9.43, 0))[0]
    chamfer(f4_22_edges, length=F4_22_SIZE, length2=F4_22_SIZE2, reference=f4_22_side)

    # F4#23
    f4_23_edges = [f1.edges().sort_by_distance(p)[0] for p in [
        (22.531571, -18.86, 1.25),
    ]]
    f4_23_side = f1.faces().sort_by_distance((22.531571, -18.86, 0))[0]
    chamfer(f4_23_edges, length=F4_23_SIZE, length2=F4_23_SIZE2, reference=f4_23_side)

    # F4#24
    f4_24_edges = [f1.edges().sort_by_distance(p)[0] for p in [
        (32.103, -28.29, 1.25),
    ]]
    f4_24_side = f1.faces().sort_by_distance((32.103, -28.29, 0))[0]
    chamfer(f4_24_edges, length=F4_24_SIZE, length2=F4_24_SIZE2, reference=f4_24_side)

    # F4#25
    f4_25_edges = [f1.edges().sort_by_distance(p)[0] for p in [
        (3.388714, -18.86, 1.25),
    ]]
    f4_25_side = f1.faces().sort_by_distance((3.388714, -18.86, 0))[0]
    chamfer(f4_25_edges, length=F4_25_SIZE, length2=F4_25_SIZE2, reference=f4_25_side)

    # F4#26
    f4_26_edges = [f1.edges().sort_by_distance(p)[0] for p in [
        (12.960143, -28.29, 1.25),
    ]]
    f4_26_side = f1.faces().sort_by_distance((12.960143, -28.29, 0))[0]
    chamfer(f4_26_edges, length=F4_26_SIZE, length2=F4_26_SIZE2, reference=f4_26_side)

    # F4#27
    f4_27_edges = [f1.edges().sort_by_distance(p)[0] for p in [
        (-6.182714, -28.29, 1.25),
    ]]
    f4_27_side = f1.faces().sort_by_distance((-6.182714, -28.29, 0))[0]
    chamfer(f4_27_edges, length=F4_27_SIZE, length2=F4_27_SIZE2, reference=f4_27_side)

    # F4#28
    f4_28_edges = [f1.edges().sort_by_distance(p)[0] for p in [
        (-34.897, 18.86, 1.25),
    ]]
    f4_28_side = f1.faces().sort_by_distance((-34.897, 18.86, 0))[0]
    chamfer(f4_28_edges, length=F4_28_SIZE, length2=F4_28_SIZE2, reference=f4_28_side)


solid = f1.part
